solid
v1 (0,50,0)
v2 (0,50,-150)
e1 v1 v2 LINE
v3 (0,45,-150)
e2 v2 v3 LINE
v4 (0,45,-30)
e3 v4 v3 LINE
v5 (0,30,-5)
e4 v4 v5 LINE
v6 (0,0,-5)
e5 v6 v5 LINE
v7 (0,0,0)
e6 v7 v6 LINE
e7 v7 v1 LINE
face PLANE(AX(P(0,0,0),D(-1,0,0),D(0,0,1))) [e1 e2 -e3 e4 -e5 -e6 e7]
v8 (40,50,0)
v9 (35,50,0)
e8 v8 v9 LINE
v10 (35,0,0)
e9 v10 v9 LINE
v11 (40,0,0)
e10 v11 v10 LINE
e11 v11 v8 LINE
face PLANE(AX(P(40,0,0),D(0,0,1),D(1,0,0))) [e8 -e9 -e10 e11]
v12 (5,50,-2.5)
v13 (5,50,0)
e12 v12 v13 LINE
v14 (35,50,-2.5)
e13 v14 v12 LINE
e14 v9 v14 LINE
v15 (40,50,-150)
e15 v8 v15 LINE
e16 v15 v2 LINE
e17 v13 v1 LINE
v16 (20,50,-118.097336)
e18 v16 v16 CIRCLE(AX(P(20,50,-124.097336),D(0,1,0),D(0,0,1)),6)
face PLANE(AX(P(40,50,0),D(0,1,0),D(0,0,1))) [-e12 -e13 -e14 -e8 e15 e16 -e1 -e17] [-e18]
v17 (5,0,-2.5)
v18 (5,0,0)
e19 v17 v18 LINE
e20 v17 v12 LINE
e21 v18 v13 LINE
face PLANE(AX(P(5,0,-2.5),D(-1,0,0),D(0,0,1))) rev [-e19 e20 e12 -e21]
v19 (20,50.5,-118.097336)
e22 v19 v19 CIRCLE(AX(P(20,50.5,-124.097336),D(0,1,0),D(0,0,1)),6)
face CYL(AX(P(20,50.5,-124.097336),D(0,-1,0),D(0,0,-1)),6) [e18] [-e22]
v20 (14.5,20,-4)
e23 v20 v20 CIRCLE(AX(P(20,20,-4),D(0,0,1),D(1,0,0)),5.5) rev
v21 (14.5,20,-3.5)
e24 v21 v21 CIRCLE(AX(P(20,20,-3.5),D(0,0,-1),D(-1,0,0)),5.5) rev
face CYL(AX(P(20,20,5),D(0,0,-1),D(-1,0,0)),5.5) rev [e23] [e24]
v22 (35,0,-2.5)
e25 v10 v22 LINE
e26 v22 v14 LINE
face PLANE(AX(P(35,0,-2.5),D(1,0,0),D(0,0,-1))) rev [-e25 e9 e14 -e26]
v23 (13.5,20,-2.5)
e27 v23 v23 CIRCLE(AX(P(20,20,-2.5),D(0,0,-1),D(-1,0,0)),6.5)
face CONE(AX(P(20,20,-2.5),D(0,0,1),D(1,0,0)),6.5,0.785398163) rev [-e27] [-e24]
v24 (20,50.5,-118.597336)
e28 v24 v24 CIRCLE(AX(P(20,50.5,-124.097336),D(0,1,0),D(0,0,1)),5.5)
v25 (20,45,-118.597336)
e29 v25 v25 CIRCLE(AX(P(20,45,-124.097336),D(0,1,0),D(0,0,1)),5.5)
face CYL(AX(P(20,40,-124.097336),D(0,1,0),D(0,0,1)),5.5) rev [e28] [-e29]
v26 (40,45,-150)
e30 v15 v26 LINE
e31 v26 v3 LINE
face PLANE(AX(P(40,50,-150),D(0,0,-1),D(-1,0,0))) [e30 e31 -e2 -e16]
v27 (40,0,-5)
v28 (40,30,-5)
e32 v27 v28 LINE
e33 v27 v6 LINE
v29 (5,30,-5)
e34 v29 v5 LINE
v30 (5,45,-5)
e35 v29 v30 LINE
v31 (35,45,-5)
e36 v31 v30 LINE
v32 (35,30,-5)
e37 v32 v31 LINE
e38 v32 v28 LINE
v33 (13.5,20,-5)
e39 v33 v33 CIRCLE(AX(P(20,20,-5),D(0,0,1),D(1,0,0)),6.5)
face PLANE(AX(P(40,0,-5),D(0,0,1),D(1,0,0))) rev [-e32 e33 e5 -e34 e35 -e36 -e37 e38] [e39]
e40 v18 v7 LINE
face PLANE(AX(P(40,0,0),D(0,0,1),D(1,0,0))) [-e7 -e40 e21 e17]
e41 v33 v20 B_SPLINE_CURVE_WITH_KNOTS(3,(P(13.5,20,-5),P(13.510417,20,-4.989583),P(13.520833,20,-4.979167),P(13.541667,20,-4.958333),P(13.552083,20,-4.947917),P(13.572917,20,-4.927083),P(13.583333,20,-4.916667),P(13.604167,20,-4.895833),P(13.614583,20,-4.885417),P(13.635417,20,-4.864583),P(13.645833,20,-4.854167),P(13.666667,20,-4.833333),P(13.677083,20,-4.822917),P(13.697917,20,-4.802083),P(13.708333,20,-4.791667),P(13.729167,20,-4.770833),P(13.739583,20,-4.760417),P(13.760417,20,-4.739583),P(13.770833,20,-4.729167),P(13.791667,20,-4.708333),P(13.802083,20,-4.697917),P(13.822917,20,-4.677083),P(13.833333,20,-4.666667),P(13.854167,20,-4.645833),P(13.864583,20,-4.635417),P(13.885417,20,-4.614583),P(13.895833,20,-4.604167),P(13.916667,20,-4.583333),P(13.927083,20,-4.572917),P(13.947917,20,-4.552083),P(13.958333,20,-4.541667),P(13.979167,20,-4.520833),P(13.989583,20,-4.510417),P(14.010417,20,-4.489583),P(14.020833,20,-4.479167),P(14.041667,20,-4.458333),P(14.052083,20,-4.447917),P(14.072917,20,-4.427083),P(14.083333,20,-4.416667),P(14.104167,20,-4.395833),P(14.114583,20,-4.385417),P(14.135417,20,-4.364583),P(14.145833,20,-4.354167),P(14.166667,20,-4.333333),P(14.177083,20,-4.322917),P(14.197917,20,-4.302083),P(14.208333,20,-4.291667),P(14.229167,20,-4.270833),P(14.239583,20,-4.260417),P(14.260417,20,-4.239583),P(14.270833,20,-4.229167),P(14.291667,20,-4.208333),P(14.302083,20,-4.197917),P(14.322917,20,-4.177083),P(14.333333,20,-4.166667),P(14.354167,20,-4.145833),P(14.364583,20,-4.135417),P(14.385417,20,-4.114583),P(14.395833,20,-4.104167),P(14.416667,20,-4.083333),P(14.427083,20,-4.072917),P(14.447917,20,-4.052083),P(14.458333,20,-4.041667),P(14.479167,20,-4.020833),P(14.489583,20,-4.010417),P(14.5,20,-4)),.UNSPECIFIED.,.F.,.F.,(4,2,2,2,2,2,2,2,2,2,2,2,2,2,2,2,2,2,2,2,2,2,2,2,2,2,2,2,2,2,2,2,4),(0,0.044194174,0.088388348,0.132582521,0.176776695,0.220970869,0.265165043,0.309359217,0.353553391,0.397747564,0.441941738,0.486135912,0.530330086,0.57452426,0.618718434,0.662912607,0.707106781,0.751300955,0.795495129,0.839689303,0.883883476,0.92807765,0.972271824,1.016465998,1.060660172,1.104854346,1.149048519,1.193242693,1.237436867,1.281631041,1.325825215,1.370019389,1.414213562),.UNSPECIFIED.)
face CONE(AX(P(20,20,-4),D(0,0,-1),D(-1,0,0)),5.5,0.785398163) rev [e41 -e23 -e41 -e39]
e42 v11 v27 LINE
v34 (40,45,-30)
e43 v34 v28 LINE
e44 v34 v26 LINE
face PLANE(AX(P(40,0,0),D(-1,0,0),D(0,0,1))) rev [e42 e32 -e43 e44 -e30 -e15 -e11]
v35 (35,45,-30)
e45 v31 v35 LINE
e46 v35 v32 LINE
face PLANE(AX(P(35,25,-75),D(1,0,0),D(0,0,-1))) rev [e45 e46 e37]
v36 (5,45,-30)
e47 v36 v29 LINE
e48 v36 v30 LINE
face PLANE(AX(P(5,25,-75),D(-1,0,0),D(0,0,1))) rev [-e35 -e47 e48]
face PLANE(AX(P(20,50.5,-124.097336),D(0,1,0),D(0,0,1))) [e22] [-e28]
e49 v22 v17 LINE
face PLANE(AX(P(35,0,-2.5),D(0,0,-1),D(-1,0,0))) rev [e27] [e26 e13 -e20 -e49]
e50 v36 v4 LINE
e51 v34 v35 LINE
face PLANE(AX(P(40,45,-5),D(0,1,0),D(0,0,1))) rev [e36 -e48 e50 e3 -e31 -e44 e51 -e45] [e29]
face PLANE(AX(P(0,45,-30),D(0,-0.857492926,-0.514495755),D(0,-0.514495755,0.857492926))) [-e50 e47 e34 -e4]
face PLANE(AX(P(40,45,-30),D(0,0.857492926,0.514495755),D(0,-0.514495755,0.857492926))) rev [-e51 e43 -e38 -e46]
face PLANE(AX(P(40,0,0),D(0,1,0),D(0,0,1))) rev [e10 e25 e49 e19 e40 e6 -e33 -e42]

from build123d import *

# Parameters (mm, degrees)
DODANIE_WYCI_GNI_CIE1_DEPTH = 40
SZKIC2_W                    = 30
SZKIC2_H                    = 2.5
WYTNIJ_WYCI_GNI_CIE1_DEPTH  = 164.095064303
EBRO3_START                 = -5
EBRO3_DEPTH                 = 5
SZKIC4_R                    = 5.5
WYTNIJ_WYCI_GNI_CIE2_DEPTH  = 10
SFAZOWANIE1_SIZE            = 1
WYTNIJ_WYCI_GNI_CIE3_DEPTH  = 10
DODANIE_WYCI_GNI_CIE2_START = 0.5
SZKIC6_R                    = 6
SZKIC6_R_2                  = 5.5
DODANIE_WYCI_GNI_CIE2_DEPTH = 0.5


# Read off the part's stored shape, not the designer's step: Żebro3
with BuildPart() as part:
    # Szkic1 → Dodanie-wyciągnięcie1 (new body)
    with BuildSketch(Plane(origin=(0, 0, 0), x_dir=(0, 0, -1), z_dir=(1, 0, 0))):
        Polygon((0, 0), (0, 50), (150, 50), (150, 45), (5, 45), (5, 0), align=None)
    extrude(amount=DODANIE_WYCI_GNI_CIE1_DEPTH)

    # Szkic2 → Wytnij-wyciągnięcie1 (cut, through all)
    with BuildSketch(Plane(origin=(0, 50, 0), x_dir=(1, 0, 0), z_dir=(0, 1, 0))):
        with Locations((20, 1.25)):
            Rectangle(SZKIC2_W, SZKIC2_H)
    extrude(amount=-WYTNIJ_WYCI_GNI_CIE1_DEPTH, mode=Mode.SUBTRACT)

    # Żebro3 outline → Żebro3 (add)
    with BuildSketch(Plane(origin=(40, 0, 0), x_dir=(0, 0, -1), z_dir=(1, 0, 0)).offset(EBRO3_START)):
        Polygon((5, 30), (30, 45), (5, 45), align=None)
    ebro3 = extrude(amount=EBRO3_DEPTH)

    # Lustro1: Żebro3 across plane
    add(ebro3.mirror(Plane(origin=(20, 0, 0), x_dir=(0, 0, 1), z_dir=(1, 0, 0))))

    # Szkic4 → Wytnij-wyciągnięcie2 (cut)
    with BuildSketch(Plane(origin=(0, 0, -5), x_dir=(-1, 0, 0), z_dir=(0, 0, -1))):
        with Locations((-20, 20)):
            Circle(SZKIC4_R)
    extrude(amount=-WYTNIJ_WYCI_GNI_CIE2_DEPTH, mode=Mode.SUBTRACT)

    # Sfazowanie1
    sfazowanie1_edges = [part.edges().sort_by_distance(p)[0] for p in [
        (25.5, 20, -2.5),
        (25.5, 20, -5),
    ]]
    chamfer(sfazowanie1_edges, length=SFAZOWANIE1_SIZE)

    # Szkic5 → Wytnij-wyciągnięcie3 (cut)
    with BuildSketch(Plane(origin=(0, 50, 0), x_dir=(1, 0, 0), z_dir=(0, 1, 0))):
        with BuildLine():
            ThreePointArc((20, 129.597336258), (14.5, 124.097336258), (20, 118.597336258))
            Line((20, 118.597336258), (20, 129.597336258))
        make_face()
        with BuildLine():
            Line((20, 129.597336258), (20, 118.597336258))
            ThreePointArc((20, 118.597336258), (23.889087297, 120.208248962), (25.5, 124.097336258))
            ThreePointArc((25.5, 124.097336258), (23.889087297, 127.986423555), (20, 129.597336258))
        make_face()
    extrude(amount=-WYTNIJ_WYCI_GNI_CIE3_DEPTH, mode=Mode.SUBTRACT)

    # Szkic6 → Dodanie-wyciągnięcie2 (add)
    with BuildSketch(Plane(origin=(0, 50, 0), x_dir=(1, 0, 0), z_dir=(0, 1, 0)).offset(DODANIE_WYCI_GNI_CIE2_START)):
        with Locations(Location((20, 124.097336258, 0), (0, 0, 270))):
            Circle(SZKIC6_R)
        with Locations(Location((20, 124.097336258, 0), (0, 0, 270))):
            Circle(SZKIC6_R_2, mode=Mode.SUBTRACT)
    extrude(amount=-DODANIE_WYCI_GNI_CIE2_DEPTH)


solid = part.part
